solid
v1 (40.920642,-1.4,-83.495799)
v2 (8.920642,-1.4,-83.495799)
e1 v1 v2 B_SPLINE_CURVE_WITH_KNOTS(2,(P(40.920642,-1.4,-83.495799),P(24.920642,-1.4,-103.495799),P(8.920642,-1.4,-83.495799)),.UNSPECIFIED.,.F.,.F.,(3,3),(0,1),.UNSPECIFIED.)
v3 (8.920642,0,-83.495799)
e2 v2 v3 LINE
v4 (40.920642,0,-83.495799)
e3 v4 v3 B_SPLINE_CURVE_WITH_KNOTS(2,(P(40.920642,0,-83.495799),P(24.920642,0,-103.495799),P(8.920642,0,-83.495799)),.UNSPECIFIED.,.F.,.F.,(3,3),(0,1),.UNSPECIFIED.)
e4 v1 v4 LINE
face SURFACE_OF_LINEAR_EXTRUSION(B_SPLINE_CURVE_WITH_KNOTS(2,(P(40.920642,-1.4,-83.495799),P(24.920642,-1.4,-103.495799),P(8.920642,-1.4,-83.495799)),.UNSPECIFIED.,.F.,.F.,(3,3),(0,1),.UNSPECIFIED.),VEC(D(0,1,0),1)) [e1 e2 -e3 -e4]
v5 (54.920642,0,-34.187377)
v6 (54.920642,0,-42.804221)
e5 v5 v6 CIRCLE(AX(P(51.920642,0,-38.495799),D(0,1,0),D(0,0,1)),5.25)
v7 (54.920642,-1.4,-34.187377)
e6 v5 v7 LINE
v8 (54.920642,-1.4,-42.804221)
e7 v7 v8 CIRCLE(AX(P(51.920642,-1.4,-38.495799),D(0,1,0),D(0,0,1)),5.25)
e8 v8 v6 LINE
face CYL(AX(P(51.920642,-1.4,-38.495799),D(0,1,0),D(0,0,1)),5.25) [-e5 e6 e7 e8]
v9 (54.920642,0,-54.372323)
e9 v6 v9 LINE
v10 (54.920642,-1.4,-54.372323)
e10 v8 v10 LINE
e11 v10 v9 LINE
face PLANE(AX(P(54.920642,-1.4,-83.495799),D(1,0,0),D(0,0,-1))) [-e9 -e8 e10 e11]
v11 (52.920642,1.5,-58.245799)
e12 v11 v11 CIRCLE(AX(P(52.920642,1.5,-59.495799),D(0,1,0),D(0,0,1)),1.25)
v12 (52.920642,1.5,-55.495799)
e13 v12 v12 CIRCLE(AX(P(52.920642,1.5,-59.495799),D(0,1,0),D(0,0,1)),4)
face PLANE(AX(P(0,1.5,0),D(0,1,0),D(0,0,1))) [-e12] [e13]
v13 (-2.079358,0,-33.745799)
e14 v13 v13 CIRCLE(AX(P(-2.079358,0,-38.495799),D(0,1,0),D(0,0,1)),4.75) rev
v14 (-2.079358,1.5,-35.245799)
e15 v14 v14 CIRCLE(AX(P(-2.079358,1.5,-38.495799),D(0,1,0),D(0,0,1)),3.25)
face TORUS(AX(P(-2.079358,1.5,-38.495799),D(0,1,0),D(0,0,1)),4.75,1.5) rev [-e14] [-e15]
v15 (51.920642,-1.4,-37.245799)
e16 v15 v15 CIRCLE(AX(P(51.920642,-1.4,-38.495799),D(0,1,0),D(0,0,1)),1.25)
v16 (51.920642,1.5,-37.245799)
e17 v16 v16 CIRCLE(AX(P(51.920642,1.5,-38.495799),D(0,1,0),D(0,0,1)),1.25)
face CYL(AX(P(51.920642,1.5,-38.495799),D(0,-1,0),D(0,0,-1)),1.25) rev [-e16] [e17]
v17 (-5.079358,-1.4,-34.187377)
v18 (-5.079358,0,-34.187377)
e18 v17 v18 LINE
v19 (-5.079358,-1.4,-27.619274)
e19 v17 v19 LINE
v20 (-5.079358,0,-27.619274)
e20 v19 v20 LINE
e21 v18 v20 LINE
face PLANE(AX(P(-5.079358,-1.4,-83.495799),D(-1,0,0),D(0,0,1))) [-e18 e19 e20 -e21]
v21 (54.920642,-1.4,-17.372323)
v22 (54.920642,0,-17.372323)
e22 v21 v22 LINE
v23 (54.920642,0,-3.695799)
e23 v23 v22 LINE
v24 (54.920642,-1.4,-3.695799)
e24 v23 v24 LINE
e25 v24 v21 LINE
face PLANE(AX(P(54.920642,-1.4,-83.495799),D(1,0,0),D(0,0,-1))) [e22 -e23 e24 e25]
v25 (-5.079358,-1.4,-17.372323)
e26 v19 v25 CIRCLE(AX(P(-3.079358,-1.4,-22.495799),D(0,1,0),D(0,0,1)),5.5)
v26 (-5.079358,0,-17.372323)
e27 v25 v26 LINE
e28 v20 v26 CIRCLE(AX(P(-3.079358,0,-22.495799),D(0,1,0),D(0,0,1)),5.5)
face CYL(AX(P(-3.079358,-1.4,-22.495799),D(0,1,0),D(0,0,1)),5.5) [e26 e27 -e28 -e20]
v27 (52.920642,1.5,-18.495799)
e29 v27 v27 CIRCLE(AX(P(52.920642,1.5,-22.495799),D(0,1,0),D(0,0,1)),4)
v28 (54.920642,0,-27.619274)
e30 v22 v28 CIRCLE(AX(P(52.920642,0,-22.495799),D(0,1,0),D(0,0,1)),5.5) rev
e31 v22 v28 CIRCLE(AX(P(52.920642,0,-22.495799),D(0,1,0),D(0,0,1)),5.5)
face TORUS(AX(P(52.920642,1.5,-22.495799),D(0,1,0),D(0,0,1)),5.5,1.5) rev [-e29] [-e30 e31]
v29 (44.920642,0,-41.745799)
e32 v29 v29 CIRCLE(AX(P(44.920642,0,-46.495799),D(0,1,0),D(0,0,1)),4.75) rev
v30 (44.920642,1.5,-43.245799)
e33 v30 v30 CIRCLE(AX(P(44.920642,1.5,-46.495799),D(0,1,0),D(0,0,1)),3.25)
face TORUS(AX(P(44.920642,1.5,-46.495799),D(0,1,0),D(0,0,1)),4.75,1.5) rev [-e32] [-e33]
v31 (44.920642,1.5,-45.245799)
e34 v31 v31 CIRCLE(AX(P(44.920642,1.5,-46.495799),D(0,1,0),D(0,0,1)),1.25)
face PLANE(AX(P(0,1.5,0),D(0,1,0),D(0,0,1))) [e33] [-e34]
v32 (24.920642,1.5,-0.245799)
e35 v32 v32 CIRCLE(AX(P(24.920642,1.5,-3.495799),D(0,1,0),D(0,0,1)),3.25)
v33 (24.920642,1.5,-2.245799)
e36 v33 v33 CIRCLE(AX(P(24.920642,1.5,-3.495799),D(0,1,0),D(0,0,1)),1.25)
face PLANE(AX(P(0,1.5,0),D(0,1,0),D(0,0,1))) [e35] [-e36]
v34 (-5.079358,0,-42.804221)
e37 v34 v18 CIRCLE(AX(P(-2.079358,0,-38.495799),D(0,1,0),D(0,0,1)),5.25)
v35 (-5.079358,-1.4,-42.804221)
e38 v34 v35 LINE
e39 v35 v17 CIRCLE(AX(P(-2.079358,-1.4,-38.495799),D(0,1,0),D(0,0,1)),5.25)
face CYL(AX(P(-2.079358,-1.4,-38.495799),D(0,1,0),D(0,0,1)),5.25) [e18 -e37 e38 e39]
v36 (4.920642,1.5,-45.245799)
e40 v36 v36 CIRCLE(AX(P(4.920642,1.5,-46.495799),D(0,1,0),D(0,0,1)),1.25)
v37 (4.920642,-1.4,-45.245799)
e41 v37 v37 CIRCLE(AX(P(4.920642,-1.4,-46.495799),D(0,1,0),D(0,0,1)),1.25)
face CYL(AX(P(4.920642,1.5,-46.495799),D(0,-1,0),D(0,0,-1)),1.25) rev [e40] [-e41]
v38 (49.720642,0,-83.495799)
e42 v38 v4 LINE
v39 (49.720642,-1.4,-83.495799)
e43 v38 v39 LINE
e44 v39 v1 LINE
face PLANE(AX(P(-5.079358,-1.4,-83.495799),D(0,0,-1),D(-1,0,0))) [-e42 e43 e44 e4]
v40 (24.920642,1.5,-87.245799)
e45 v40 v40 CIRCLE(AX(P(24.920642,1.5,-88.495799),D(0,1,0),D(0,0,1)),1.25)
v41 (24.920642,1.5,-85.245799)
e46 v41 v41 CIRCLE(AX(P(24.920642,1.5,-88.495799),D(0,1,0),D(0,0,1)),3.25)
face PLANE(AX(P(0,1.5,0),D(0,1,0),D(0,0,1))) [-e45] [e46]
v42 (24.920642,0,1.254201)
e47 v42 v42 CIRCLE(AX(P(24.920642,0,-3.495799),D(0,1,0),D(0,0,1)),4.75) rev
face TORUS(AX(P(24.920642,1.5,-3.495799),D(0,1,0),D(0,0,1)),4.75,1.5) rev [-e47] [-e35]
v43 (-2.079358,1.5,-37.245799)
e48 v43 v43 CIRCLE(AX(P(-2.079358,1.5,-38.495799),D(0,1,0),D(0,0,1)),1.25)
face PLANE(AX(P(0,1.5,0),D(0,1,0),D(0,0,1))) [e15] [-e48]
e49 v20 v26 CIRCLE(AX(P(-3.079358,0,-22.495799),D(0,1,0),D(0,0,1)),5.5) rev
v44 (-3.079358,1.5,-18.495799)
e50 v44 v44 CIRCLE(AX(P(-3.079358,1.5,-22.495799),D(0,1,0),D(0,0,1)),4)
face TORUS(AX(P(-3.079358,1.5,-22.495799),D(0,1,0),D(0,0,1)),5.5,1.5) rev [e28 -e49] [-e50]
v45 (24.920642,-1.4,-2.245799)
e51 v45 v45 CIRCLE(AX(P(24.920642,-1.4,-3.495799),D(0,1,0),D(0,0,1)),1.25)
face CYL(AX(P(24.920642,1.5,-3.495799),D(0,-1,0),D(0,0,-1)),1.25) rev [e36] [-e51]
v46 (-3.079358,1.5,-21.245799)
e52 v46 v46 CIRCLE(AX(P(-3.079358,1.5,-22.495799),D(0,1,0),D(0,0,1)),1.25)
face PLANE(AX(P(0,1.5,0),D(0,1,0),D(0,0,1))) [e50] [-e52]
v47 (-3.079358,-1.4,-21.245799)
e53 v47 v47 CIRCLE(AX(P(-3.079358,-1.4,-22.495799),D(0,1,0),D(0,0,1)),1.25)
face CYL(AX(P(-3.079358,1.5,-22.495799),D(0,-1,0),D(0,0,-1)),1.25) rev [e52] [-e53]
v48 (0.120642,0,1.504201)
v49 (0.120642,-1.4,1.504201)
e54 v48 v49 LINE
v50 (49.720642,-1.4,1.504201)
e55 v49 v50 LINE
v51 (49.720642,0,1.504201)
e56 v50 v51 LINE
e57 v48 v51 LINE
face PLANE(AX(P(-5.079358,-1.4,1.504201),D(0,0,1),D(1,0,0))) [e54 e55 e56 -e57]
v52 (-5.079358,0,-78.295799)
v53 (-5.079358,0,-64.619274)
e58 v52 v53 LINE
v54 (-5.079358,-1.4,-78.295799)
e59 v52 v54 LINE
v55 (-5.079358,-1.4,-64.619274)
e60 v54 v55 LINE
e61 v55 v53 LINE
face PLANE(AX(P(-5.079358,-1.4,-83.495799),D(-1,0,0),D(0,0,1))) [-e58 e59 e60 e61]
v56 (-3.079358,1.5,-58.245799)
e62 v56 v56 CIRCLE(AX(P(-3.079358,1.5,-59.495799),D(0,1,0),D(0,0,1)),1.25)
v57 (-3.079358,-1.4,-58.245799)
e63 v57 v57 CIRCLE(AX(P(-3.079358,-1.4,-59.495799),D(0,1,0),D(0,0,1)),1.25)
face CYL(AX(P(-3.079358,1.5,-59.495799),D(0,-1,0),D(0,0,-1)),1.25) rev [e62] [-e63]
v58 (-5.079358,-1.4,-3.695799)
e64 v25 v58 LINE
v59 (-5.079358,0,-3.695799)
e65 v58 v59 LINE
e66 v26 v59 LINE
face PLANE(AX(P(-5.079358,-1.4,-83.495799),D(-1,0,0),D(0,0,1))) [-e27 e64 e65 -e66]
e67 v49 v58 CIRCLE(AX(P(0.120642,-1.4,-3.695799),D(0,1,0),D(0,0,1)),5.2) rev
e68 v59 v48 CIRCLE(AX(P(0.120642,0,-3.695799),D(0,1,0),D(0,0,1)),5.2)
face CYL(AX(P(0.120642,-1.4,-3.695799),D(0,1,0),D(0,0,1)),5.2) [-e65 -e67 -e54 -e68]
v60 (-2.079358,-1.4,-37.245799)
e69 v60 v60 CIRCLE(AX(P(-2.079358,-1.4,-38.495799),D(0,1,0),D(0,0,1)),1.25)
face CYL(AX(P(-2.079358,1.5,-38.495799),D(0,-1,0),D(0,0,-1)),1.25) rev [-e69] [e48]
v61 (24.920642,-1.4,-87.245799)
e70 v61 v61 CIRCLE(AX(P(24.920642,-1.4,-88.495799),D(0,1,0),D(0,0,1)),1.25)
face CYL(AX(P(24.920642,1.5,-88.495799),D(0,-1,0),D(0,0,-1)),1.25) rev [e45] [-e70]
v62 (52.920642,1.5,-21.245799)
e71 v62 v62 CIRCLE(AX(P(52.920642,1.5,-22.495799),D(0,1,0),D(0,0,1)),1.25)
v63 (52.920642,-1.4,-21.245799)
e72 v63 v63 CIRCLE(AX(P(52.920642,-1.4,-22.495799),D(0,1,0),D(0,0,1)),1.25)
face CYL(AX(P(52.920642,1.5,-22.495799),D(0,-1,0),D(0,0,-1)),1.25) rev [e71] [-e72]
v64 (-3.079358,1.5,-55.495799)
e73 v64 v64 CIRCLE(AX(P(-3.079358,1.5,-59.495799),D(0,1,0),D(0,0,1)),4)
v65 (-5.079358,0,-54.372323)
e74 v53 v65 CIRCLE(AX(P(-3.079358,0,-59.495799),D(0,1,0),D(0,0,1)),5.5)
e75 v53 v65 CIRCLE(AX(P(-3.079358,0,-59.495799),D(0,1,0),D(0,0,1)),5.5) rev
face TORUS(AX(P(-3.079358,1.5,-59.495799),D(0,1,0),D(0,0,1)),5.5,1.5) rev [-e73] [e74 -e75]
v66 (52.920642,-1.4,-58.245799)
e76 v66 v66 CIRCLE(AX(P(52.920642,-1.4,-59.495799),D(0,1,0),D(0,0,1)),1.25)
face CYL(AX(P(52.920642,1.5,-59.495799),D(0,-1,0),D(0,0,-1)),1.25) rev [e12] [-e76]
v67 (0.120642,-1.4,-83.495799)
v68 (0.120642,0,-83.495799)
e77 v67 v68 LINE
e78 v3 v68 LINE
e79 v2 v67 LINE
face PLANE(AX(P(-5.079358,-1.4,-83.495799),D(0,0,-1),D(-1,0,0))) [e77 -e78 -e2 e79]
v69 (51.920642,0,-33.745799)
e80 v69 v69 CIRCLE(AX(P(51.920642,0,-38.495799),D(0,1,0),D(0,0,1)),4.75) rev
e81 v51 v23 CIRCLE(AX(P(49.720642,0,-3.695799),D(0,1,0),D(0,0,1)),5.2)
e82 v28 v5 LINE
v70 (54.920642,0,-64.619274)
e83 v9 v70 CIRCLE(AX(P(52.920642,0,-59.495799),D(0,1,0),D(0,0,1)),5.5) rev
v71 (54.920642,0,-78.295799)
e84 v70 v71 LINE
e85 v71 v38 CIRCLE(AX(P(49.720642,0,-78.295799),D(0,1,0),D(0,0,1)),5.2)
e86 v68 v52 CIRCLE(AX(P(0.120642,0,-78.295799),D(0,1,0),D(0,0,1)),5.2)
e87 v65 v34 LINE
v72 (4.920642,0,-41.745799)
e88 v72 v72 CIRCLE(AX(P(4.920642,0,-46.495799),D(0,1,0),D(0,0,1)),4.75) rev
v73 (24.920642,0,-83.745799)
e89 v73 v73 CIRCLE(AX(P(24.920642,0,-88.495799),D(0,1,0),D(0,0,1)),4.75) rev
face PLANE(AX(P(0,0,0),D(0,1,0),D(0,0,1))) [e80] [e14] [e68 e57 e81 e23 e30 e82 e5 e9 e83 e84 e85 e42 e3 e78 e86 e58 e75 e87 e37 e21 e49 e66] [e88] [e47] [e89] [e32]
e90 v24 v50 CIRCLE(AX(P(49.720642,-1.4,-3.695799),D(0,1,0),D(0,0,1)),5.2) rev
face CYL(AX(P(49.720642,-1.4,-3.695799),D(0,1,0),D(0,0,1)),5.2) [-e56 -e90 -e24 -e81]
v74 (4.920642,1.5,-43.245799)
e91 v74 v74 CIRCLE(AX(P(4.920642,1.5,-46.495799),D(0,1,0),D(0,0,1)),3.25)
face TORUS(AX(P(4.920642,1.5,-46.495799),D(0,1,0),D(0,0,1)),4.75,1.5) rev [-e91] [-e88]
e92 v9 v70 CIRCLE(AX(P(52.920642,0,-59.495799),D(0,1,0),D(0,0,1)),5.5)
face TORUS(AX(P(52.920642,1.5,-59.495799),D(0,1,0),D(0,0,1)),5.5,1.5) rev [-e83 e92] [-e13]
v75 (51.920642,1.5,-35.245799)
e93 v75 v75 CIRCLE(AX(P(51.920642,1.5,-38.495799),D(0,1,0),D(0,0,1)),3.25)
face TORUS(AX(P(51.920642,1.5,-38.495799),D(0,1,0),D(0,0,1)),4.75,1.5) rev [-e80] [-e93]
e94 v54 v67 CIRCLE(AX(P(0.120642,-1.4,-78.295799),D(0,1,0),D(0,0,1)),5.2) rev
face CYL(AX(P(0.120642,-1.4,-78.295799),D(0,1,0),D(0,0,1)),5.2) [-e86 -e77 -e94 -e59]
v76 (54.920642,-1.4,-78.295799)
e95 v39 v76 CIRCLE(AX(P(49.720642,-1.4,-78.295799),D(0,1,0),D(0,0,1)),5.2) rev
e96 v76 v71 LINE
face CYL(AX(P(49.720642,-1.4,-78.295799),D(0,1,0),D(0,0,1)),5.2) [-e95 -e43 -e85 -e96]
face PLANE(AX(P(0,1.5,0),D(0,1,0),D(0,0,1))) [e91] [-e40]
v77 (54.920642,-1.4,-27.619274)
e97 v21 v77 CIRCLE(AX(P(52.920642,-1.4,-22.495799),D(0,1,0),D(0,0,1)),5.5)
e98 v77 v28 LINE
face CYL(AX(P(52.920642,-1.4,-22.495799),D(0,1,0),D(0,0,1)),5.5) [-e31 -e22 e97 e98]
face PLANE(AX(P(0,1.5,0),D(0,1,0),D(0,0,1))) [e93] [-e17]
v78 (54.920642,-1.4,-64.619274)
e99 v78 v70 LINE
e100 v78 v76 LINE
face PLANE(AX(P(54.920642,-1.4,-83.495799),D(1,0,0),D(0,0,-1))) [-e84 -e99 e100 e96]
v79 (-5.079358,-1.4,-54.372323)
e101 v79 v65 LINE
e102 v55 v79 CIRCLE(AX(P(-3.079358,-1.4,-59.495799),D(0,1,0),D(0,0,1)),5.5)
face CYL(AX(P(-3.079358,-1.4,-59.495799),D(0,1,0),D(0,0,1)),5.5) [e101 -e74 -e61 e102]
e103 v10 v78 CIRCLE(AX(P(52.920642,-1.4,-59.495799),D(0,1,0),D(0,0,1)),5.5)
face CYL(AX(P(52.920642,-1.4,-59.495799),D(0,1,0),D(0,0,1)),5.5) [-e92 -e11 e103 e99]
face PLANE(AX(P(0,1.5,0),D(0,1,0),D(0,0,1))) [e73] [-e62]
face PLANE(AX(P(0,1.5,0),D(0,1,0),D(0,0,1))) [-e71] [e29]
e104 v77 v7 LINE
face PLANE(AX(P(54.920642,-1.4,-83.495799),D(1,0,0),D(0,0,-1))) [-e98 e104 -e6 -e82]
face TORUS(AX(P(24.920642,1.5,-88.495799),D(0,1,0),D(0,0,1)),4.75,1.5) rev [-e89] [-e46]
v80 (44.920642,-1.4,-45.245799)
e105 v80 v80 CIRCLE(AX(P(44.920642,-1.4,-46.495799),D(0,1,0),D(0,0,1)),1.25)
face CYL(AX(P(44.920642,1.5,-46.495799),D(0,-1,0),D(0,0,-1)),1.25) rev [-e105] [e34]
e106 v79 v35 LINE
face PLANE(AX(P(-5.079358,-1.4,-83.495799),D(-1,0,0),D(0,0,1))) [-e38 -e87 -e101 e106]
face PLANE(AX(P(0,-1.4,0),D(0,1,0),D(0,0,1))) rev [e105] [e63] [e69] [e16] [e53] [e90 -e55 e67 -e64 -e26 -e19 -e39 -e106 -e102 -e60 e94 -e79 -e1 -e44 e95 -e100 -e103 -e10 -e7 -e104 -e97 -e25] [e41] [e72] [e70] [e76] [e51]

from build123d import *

# Parameters (mm, degrees)
SKETCH2_W             = 60
SKETCH2_H             = 85
BOSS_EXTRUDE1_DEPTH   = 1.4
SKETCH13_R            = 5.25
CUT_EXTRUDE7_DEPTH    = 2
SKETCH13_4_R          = 3.25
SKETCH13_4_R_2        = 1.25
BOSS_EXTRUDE6_DEPTH   = 1.5
BOSS_EXTRUDE6_2_DEPTH = 1.5
BOSS_EXTRUDE6_3_DEPTH = 1.5
SKETCH13_14_R         = 5.25
BOSS_EXTRUDE18_DEPTH  = 1.4
SKETCH13_17_R         = 3.25
SKETCH13_17_R_2       = 1.25
BOSS_EXTRUDE19_DEPTH  = 1.4
SKETCH13_15_R         = 1.25
CUT_EXTRUDE8_DEPTH    = 110.600167471
FILLET9_R             = 1.5
SKETCH11_R            = 3.25
SKETCH11_R_2          = 1.25
BOSS_EXTRUDE5_DEPTH   = 1.5
FILLET1_R             = 5.2
SKETCH11_3_R          = 1.25
CUT_EXTRUDE3_DEPTH    = 110.600167471
FILLET4_R             = 1.5
BOSS_EXTRUDE11_START  = -1.4
SKETCH13_6_R          = 1.25
BOSS_EXTRUDE11_DEPTH  = 1.4
BOSS_EXTRUDE9_DEPTH   = 1.4
SKETCH3_9_R           = 1.25
BOSS_EXTRUDE10_DEPTH  = 1.5
SKETCH3_10_R          = 1.25
CUT_EXTRUDE6_DEPTH    = 111.257361727
FILLET6_R             = 1.5


with BuildPart() as part:
    # Sketch2 → Boss-Extrude1 (new body)
    with BuildSketch(Plane(origin=(0, 0, 0), x_dir=(1, 0, 0), z_dir=(0, 1, 0))):
        with Locations((24.920642049, 40.995798661)):
            Rectangle(SKETCH2_W, SKETCH2_H)
    extrude(amount=-BOSS_EXTRUDE1_DEPTH)

    # Sketch13 → Cut-Extrude7 (cut)
    with BuildSketch(Plane(origin=(0, 0, 0), x_dir=(1, 0, 0), z_dir=(0, 1, 0))):
        with Locations((51.920642049, 38.495798661)):
            Circle(SKETCH13_R)
        with Locations((-2.079357951, 38.495798661)):
            Circle(SKETCH13_R)
    extrude(amount=-CUT_EXTRUDE7_DEPTH, mode=Mode.SUBTRACT)



with BuildPart() as body_2:
    # Sketch13<4> → Boss-Extrude6 (new body)
    with BuildSketch(Plane(origin=(0, 0, 0), x_dir=(1, 0, 0), z_dir=(0, 1, 0))):
        with Locations(Location((51.920642049, 38.495798661, 0), (0, 0, 270))):
            Circle(SKETCH13_4_R)
        with Locations(Location((51.920642049, 38.495798661, 0), (0, 0, 270))):
            Circle(SKETCH13_4_R_2, mode=Mode.SUBTRACT)
    extrude(amount=BOSS_EXTRUDE6_DEPTH)


with BuildPart() as body_3:
    # Sketch13<4> → Boss-Extrude6 2 (new body)
    with BuildSketch(Plane(origin=(0, 0, 0), x_dir=(1, 0, 0), z_dir=(0, 1, 0))):
        with Locations(Location((-2.079357951, 38.495798661, 0), (0, 0, 270))):
            Circle(SKETCH13_4_R)
        with Locations(Location((-2.079357951, 38.495798661, 0), (0, 0, 270))):
            Circle(SKETCH13_4_R_2, mode=Mode.SUBTRACT)
    extrude(amount=BOSS_EXTRUDE6_2_DEPTH)


with BuildPart() as body_4:
    # Sketch13<4> → Boss-Extrude6 3 (new body)
    with BuildSketch(Plane(origin=(0, 0, 0), x_dir=(1, 0, 0), z_dir=(0, 1, 0))):
        with Locations(Location((24.920642049, 88.495798661, 0), (0, 0, 270))):
            Circle(SKETCH13_4_R)
        with Locations(Location((24.920642049, 88.495798661, 0), (0, 0, 270))):
            Circle(SKETCH13_4_R_2, mode=Mode.SUBTRACT)
    extrude(amount=BOSS_EXTRUDE6_3_DEPTH)


with BuildPart() as part_1:
    add(part.part)

    add(body_2.part)  # Boss-Extrude18 merges body 2

    add(body_3.part)  # Boss-Extrude18 merges body 3
    # Sketch13<14> → Boss-Extrude18 (add)
    with BuildSketch(Plane(origin=(0, 0, 0), x_dir=(1, 0, 0), z_dir=(0, 1, 0))):
        with Locations((51.920642049, 38.495798661)):
            Circle(SKETCH13_14_R)
        with Locations((-2.079357951, 38.495798661)):
            Circle(SKETCH13_14_R)
    extrude(amount=-BOSS_EXTRUDE18_DEPTH)


    add(body_4.part)  # Boss-Extrude19 merges body 4
    # Sketch13<17> → Boss-Extrude19 (add)
    # profile 1 of 2: a face of its own
    with BuildSketch(Plane(origin=(0, 0, 0), x_dir=(1, 0, 0), z_dir=(0, 1, 0))):
        with BuildLine():
            Line((8.920642049, 83.495798661), (40.920642049, 83.495798661))
            add(Edge.make_bspline(
                [(40.920642049, 83.495798661), (24.920642049, 103.495798661), (8.920642049, 83.495798661)],
                knots=[0, 0, 0, 1, 1, 1], degree=2))
        make_face()
        with Locations(Location((24.920642049, 88.495798661, 0), (0, 0, 270))):
            Circle(SKETCH13_17_R, mode=Mode.SUBTRACT)
    # profile 2 of 2: a face of its own
    with BuildSketch(Plane(origin=(0, 0, 0), x_dir=(1, 0, 0), z_dir=(0, 1, 0))):
        with Locations(Location((24.920642049, 88.495798661, 0), (0, 0, 270))):
            Circle(SKETCH13_17_R)
        with Locations(Location((24.920642049, 88.495798661, 0), (0, 0, 270))):
            Circle(SKETCH13_17_R_2, mode=Mode.SUBTRACT)
    extrude(amount=-BOSS_EXTRUDE19_DEPTH)

    # Sketch13<15> → Cut-Extrude8 (cut, through all)
    with BuildSketch(Plane(origin=(0, 0, 0), x_dir=(1, 0, 0), z_dir=(0, 1, 0))):
        with Locations(Location((51.920642049, 38.495798661, 0), (0, 0, 270))):
            Circle(SKETCH13_15_R)
        with Locations(Location((-2.079357951, 38.495798661, 0), (0, 0, 270))):
            Circle(SKETCH13_15_R)
    extrude(amount=-CUT_EXTRUDE8_DEPTH, mode=Mode.SUBTRACT)

    # Fillet9
    fillet9_edges = [part_1.edges().sort_by_distance(p)[0] for p in [
        (24.920642049, 0, -91.745798661),
        (51.920642049, 0, -41.745798661),
        (-2.079357951, 0, -41.745798661),
    ]]
    fillet(fillet9_edges, radius=FILLET9_R - 0.0001)  # a hair under: the kernel refuses the full size

    # Sketch11 → Boss-Extrude5 (add)
    # profile 1 of 3: a face of its own
    with BuildSketch(Plane(origin=(0, 0, 0), x_dir=(1, 0, 0), z_dir=(0, 1, 0))):
        with Locations(Location((24.920642049, 3.495798661, 0), (0, 0, 270))):
            Circle(SKETCH11_R)
        with Locations(Location((24.920642049, 3.495798661, 0), (0, 0, 270))):
            Circle(SKETCH11_R_2, mode=Mode.SUBTRACT)
    # profile 2 of 3: a face of its own
    with BuildSketch(Plane(origin=(0, 0, 0), x_dir=(1, 0, 0), z_dir=(0, 1, 0))):
        with Locations(Location((4.920642049, 46.495798661, 0), (0, 0, 270))):
            Circle(SKETCH11_R)
        with Locations(Location((4.920642049, 46.495798661, 0), (0, 0, 270))):
            Circle(SKETCH11_R_2, mode=Mode.SUBTRACT)
    # profile 3 of 3: a face of its own
    with BuildSketch(Plane(origin=(0, 0, 0), x_dir=(1, 0, 0), z_dir=(0, 1, 0))):
        with Locations(Location((44.920642049, 46.495798661, 0), (0, 0, 270))):
            Circle(SKETCH11_R)
        with Locations(Location((44.920642049, 46.495798661, 0), (0, 0, 270))):
            Circle(SKETCH11_R_2, mode=Mode.SUBTRACT)
    extrude(amount=BOSS_EXTRUDE5_DEPTH)

    # Fillet1
    fillet1_edges = [part_1.edges().sort_by_distance(p)[0] for p in [
        (-5.079357951, -0.7, 1.504201339),
        (54.920642049, -0.7, -83.495798661),
        (-5.079357951, -0.7, -83.495798661),
        (54.920642049, -0.7, 1.504201339),
    ]]
    fillet(fillet1_edges, radius=FILLET1_R)

    # Sketch11<3> → Cut-Extrude3 (cut, through all)
    with BuildSketch(Plane(origin=(0, 0, 0), x_dir=(1, 0, 0), z_dir=(0, 1, 0))):
        with Locations(Location((24.920642049, 3.495798661, 0), (0, 0, 270))):
            Circle(SKETCH11_3_R)
        with Locations(Location((44.920642049, 46.495798661, 0), (0, 0, 270))):
            Circle(SKETCH11_3_R)
        with Locations(Location((4.920642049, 46.495798661, 0), (0, 0, 270))):
            Circle(SKETCH11_3_R)
    extrude(amount=-CUT_EXTRUDE3_DEPTH, mode=Mode.SUBTRACT)

    # Fillet4
    fillet4_edges = [part_1.edges().sort_by_distance(p)[0] for p in [
        (24.920642049, 0, -6.745798661),
        (4.920642049, 0, -49.745798661),
        (44.920642049, 0, -49.745798661),
    ]]
    fillet(fillet4_edges, radius=FILLET4_R - 0.0001)  # a hair under: the kernel refuses the full size

    # Sketch13<6> → Boss-Extrude11 (add)
    # profile 1 of 2: a face of its own
    with BuildSketch(Plane(origin=(0, 0, 0), x_dir=(1, 0, 0), z_dir=(0, 1, 0)).offset(BOSS_EXTRUDE11_START)):
        with BuildLine():
            ThreePointArc((1.170642049, 38.495798661), (-1.441980511, 41.682685857), (-5.079357951, 39.745798661))
            Line((-5.079357951, 39.745798661), (-5.079357951, 37.245798661))
            ThreePointArc((-5.079357951, 37.245798661), (-1.441980511, 35.308911465), (1.170642049, 38.495798661))
        make_face()
        with Locations(Location((-2.079357951, 38.495798661, 0), (0, 0, 270))):
            Circle(SKETCH13_6_R, mode=Mode.SUBTRACT)
    # profile 2 of 2: a face of its own
    with BuildSketch(Plane(origin=(0, 0, 0), x_dir=(1, 0, 0), z_dir=(0, 1, 0)).offset(BOSS_EXTRUDE11_START)):
        with BuildLine():
            Line((54.920642049, 37.245798661), (54.920642049, 39.745798661))
            ThreePointArc((54.920642049, 39.745798661), (48.670642049, 38.495798661), (54.920642049, 37.245798661))
        make_face()
        with Locations(Location((51.920642049, 38.495798661, 0), (0, 0, 270))):
            Circle(SKETCH13_6_R, mode=Mode.SUBTRACT)
    extrude(amount=BOSS_EXTRUDE11_DEPTH)

    # Sketch3 → Boss-Extrude9 (add)
    with BuildSketch(Plane(origin=(0, 0, 0), x_dir=(1, 0, 0), z_dir=(0, 1, 0))):
        with BuildLine():
            ThreePointArc((54.920642049, 27.619274044), (47.420642049, 22.495798661), (54.920642049, 17.372323278))
            Line((54.920642049, 17.372323278), (54.920642049, 19.031697046))
            ThreePointArc((54.920642049, 19.031697046), (48.920642049, 22.495798661), (54.920642049, 25.959900276))
            Line((54.920642049, 25.959900276), (54.920642049, 27.619274044))
        make_face()
        with BuildLine():
            Line((54.920642049, 19.031697046), (54.920642049, 17.372323278))
            ThreePointArc((54.920642049, 17.372323278), (57.46211758, 19.393380249), (58.420642049, 22.495798661))
            ThreePointArc((58.420642049, 22.495798661), (57.46211758, 25.598217072), (54.920642049, 27.619274044))
            Line((54.920642049, 27.619274044), (54.920642049, 25.959900276))
            ThreePointArc((54.920642049, 25.959900276), (56.384743664, 24.495798661), (56.920642049, 22.495798661))
            ThreePointArc((56.920642049, 22.495798661), (56.384743664, 20.495798661), (54.920642049, 19.031697046))
        make_face()
        with BuildLine():
            Line((54.920642049, 25.959900276), (54.920642049, 19.031697046))
            ThreePointArc((54.920642049, 19.031697046), (56.384743664, 20.495798661), (56.920642049, 22.495798661))
            ThreePointArc((56.920642049, 22.495798661), (56.384743664, 24.495798661), (54.920642049, 25.959900276))
        make_face()
        with BuildLine():
            Line((54.920642049, 62.959900276), (54.920642049, 56.031697046))
            ThreePointArc((54.920642049, 56.031697046), (56.384743664, 57.495798661), (56.920642049, 59.495798661))
            ThreePointArc((56.920642049, 59.495798661), (56.384743664, 61.495798661), (54.920642049, 62.959900276))
        make_face()
        with BuildLine():
            ThreePointArc((54.920642049, 64.619274044), (47.420642049, 59.495798661), (54.920642049, 54.372323278))
            Line((54.920642049, 54.372323278), (54.920642049, 56.031697046))
            ThreePointArc((54.920642049, 56.031697046), (48.920642049, 59.495798661), (54.920642049, 62.959900276))
            Line((54.920642049, 62.959900276), (54.920642049, 64.619274044))
        make_face()
        with BuildLine():
            Line((54.920642049, 56.031697046), (54.920642049, 54.372323278))
            ThreePointArc((54.920642049, 54.372323278), (57.46211758, 56.393380249), (58.420642049, 59.495798661))
            ThreePointArc((58.420642049, 59.495798661), (57.46211758, 62.598217072), (54.920642049, 64.619274044))
            Line((54.920642049, 64.619274044), (54.920642049, 62.959900276))
            ThreePointArc((54.920642049, 62.959900276), (56.384743664, 61.495798661), (56.920642049, 59.495798661))
            ThreePointArc((56.920642049, 59.495798661), (56.384743664, 57.495798661), (54.920642049, 56.031697046))
        make_face()
        with BuildLine():
            Line((-5.079357951, 19.031697046), (-5.079357951, 25.959900276))
            ThreePointArc((-5.079357951, 25.959900276), (-7.079357951, 22.495798661), (-5.079357951, 19.031697046))
        make_face()
        with BuildLine():
            ThreePointArc((2.420642049, 22.495798661), (0.023060461, 27.037274192), (-5.079357951, 27.619274044))
            Line((-5.079357951, 27.619274044), (-5.079357951, 25.959900276))
            ThreePointArc((-5.079357951, 25.959900276), (-1.079357951, 25.959900276), (0.920642049, 22.495798661))
            ThreePointArc((0.920642049, 22.495798661), (-1.079357951, 19.031697046), (-5.079357951, 19.031697046))
            Line((-5.079357951, 19.031697046), (-5.079357951, 17.372323278))
            ThreePointArc((-5.079357951, 17.372323278), (0.023060461, 17.95432313), (2.420642049, 22.495798661))
        make_face()
        with BuildLine():
            Line((-5.079357951, 25.959900276), (-5.079357951, 27.619274044))
            ThreePointArc((-5.079357951, 27.619274044), (-8.579357951, 22.495798661), (-5.079357951, 17.372323278))
            Line((-5.079357951, 17.372323278), (-5.079357951, 19.031697046))
            ThreePointArc((-5.079357951, 19.031697046), (-7.079357951, 22.495798661), (-5.079357951, 25.959900276))
        make_face()
        with BuildLine():
            Line((-5.079357951, 56.031697046), (-5.079357951, 62.959900276))
            ThreePointArc((-5.079357951, 62.959900276), (-7.079357951, 59.495798661), (-5.079357951, 56.031697046))
        make_face()
        with BuildLine():
            ThreePointArc((2.420642049, 59.495798661), (0.023060461, 64.037274192), (-5.079357951, 64.619274044))
            Line((-5.079357951, 64.619274044), (-5.079357951, 62.959900276))
            ThreePointArc((-5.079357951, 62.959900276), (-1.079357951, 62.959900276), (0.920642049, 59.495798661))
            ThreePointArc((0.920642049, 59.495798661), (-1.079357951, 56.031697046), (-5.079357951, 56.031697046))
            Line((-5.079357951, 56.031697046), (-5.079357951, 54.372323278))
            ThreePointArc((-5.079357951, 54.372323278), (0.023060461, 54.95432313), (2.420642049, 59.495798661))
        make_face()
        with BuildLine():
            Line((-5.079357951, 62.959900276), (-5.079357951, 64.619274044))
            ThreePointArc((-5.079357951, 64.619274044), (-8.579357951, 59.495798661), (-5.079357951, 54.372323278))
            Line((-5.079357951, 54.372323278), (-5.079357951, 56.031697046))
            ThreePointArc((-5.079357951, 56.031697046), (-7.079357951, 59.495798661), (-5.079357951, 62.959900276))
        make_face()
    extrude(amount=-BOSS_EXTRUDE9_DEPTH)

    # Sketch3<9> → Boss-Extrude10 (add)
    # profile 1 of 8: a face of its own
    with BuildSketch(Plane(origin=(0, 0, 0), x_dir=(1, 0, 0), z_dir=(0, 1, 0))):
        with BuildLine():
            ThreePointArc((54.920642049, 25.959900276), (48.920642049, 22.495798661), (54.920642049, 19.031697046))
            Line((54.920642049, 19.031697046), (54.920642049, 25.959900276))
        make_face()
        with Locations(Location((52.920642049, 22.495798661, 0), (0, 0, 270))):
            Circle(SKETCH3_9_R, mode=Mode.SUBTRACT)
    # profile 2 of 8: a face of its own
    with BuildSketch(Plane(origin=(0, 0, 0), x_dir=(1, 0, 0), z_dir=(0, 1, 0))):
        with BuildLine():
            Line((54.920642049, 25.959900276), (54.920642049, 19.031697046))
            ThreePointArc((54.920642049, 19.031697046), (56.384743664, 20.495798661), (56.920642049, 22.495798661))
            ThreePointArc((56.920642049, 22.495798661), (56.384743664, 24.495798661), (54.920642049, 25.959900276))
        make_face()
    # profile 3 of 8: a face of its own
    with BuildSketch(Plane(origin=(0, 0, 0), x_dir=(1, 0, 0), z_dir=(0, 1, 0))):
        with BuildLine():
            ThreePointArc((0.920642049, 22.495798661), (-1.079357951, 25.959900276), (-5.079357951, 25.959900276))
            Line((-5.079357951, 25.959900276), (-5.079357951, 19.031697046))
            ThreePointArc((-5.079357951, 19.031697046), (-1.079357951, 19.031697046), (0.920642049, 22.495798661))
        make_face()
        with Locations(Location((-3.079357951, 22.495798661, 0), (0, 0, 270))):
            Circle(SKETCH3_9_R, mode=Mode.SUBTRACT)
    # profile 4 of 8: a face of its own
    with BuildSketch(Plane(origin=(0, 0, 0), x_dir=(1, 0, 0), z_dir=(0, 1, 0))):
        with BuildLine():
            Line((-5.079357951, 19.031697046), (-5.079357951, 25.959900276))
            ThreePointArc((-5.079357951, 25.959900276), (-7.079357951, 22.495798661), (-5.079357951, 19.031697046))
        make_face()
    # profile 5 of 8: a face of its own
    with BuildSketch(Plane(origin=(0, 0, 0), x_dir=(1, 0, 0), z_dir=(0, 1, 0))):
        with BuildLine():
            ThreePointArc((0.920642049, 59.495798661), (-1.079357951, 62.959900276), (-5.079357951, 62.959900276))
            Line((-5.079357951, 62.959900276), (-5.079357951, 56.031697046))
            ThreePointArc((-5.079357951, 56.031697046), (-1.079357951, 56.031697046), (0.920642049, 59.495798661))
        make_face()
        with Locations(Location((-3.079357951, 59.495798661, 0), (0, 0, 270))):
            Circle(SKETCH3_9_R, mode=Mode.SUBTRACT)
    # profile 6 of 8: a face of its own
    with BuildSketch(Plane(origin=(0, 0, 0), x_dir=(1, 0, 0), z_dir=(0, 1, 0))):
        with BuildLine():
            Line((-5.079357951, 56.031697046), (-5.079357951, 62.959900276))
            ThreePointArc((-5.079357951, 62.959900276), (-7.079357951, 59.495798661), (-5.079357951, 56.031697046))
        make_face()
    # profile 7 of 8: a face of its own
    with BuildSketch(Plane(origin=(0, 0, 0), x_dir=(1, 0, 0), z_dir=(0, 1, 0))):
        with BuildLine():
            Line((54.920642049, 62.959900276), (54.920642049, 56.031697046))
            ThreePointArc((54.920642049, 56.031697046), (56.384743664, 57.495798661), (56.920642049, 59.495798661))
            ThreePointArc((56.920642049, 59.495798661), (56.384743664, 61.495798661), (54.920642049, 62.959900276))
        make_face()
    # profile 8 of 8: a face of its own
    with BuildSketch(Plane(origin=(0, 0, 0), x_dir=(1, 0, 0), z_dir=(0, 1, 0))):
        with BuildLine():
            ThreePointArc((54.920642049, 62.959900276), (48.920642049, 59.495798661), (54.920642049, 56.031697046))
            Line((54.920642049, 56.031697046), (54.920642049, 62.959900276))
        make_face()
        with Locations(Location((52.920642049, 59.495798661, 0), (0, 0, 270))):
            Circle(SKETCH3_9_R, mode=Mode.SUBTRACT)
    extrude(amount=BOSS_EXTRUDE10_DEPTH)

    # Sketch3<10> → Cut-Extrude6 (cut, through all)
    with BuildSketch(Plane(origin=(0, 0, 0), x_dir=(1, 0, 0), z_dir=(0, 1, 0))):
        with Locations(Location((52.920642049, 22.495798661, 0), (0, 0, 270))):
            Circle(SKETCH3_10_R)
        with Locations(Location((-3.079357951, 22.495798661, 0), (0, 0, 270))):
            Circle(SKETCH3_10_R)
        with Locations(Location((52.920642049, 59.495798661, 0), (0, 0, 270))):
            Circle(SKETCH3_10_R)
        with Locations(Location((-3.079357951, 59.495798661, 0), (0, 0, 270))):
            Circle(SKETCH3_10_R)
    extrude(amount=-CUT_EXTRUDE6_DEPTH, mode=Mode.SUBTRACT)

    # Fillet6
    fillet6_edges = [part_1.edges().sort_by_distance(p)[0] for p in [
        (50.920642049, 0, -25.959900276),
        (-1.079357951, 0, -19.031697046),
        (-1.079357951, 0, -56.031697046),
        (50.920642049, 0, -62.959900276),
    ]]
    fillet(fillet6_edges, radius=FILLET6_R - 0.0001)  # a hair under: the kernel refuses the full size


solid = part_1.part
